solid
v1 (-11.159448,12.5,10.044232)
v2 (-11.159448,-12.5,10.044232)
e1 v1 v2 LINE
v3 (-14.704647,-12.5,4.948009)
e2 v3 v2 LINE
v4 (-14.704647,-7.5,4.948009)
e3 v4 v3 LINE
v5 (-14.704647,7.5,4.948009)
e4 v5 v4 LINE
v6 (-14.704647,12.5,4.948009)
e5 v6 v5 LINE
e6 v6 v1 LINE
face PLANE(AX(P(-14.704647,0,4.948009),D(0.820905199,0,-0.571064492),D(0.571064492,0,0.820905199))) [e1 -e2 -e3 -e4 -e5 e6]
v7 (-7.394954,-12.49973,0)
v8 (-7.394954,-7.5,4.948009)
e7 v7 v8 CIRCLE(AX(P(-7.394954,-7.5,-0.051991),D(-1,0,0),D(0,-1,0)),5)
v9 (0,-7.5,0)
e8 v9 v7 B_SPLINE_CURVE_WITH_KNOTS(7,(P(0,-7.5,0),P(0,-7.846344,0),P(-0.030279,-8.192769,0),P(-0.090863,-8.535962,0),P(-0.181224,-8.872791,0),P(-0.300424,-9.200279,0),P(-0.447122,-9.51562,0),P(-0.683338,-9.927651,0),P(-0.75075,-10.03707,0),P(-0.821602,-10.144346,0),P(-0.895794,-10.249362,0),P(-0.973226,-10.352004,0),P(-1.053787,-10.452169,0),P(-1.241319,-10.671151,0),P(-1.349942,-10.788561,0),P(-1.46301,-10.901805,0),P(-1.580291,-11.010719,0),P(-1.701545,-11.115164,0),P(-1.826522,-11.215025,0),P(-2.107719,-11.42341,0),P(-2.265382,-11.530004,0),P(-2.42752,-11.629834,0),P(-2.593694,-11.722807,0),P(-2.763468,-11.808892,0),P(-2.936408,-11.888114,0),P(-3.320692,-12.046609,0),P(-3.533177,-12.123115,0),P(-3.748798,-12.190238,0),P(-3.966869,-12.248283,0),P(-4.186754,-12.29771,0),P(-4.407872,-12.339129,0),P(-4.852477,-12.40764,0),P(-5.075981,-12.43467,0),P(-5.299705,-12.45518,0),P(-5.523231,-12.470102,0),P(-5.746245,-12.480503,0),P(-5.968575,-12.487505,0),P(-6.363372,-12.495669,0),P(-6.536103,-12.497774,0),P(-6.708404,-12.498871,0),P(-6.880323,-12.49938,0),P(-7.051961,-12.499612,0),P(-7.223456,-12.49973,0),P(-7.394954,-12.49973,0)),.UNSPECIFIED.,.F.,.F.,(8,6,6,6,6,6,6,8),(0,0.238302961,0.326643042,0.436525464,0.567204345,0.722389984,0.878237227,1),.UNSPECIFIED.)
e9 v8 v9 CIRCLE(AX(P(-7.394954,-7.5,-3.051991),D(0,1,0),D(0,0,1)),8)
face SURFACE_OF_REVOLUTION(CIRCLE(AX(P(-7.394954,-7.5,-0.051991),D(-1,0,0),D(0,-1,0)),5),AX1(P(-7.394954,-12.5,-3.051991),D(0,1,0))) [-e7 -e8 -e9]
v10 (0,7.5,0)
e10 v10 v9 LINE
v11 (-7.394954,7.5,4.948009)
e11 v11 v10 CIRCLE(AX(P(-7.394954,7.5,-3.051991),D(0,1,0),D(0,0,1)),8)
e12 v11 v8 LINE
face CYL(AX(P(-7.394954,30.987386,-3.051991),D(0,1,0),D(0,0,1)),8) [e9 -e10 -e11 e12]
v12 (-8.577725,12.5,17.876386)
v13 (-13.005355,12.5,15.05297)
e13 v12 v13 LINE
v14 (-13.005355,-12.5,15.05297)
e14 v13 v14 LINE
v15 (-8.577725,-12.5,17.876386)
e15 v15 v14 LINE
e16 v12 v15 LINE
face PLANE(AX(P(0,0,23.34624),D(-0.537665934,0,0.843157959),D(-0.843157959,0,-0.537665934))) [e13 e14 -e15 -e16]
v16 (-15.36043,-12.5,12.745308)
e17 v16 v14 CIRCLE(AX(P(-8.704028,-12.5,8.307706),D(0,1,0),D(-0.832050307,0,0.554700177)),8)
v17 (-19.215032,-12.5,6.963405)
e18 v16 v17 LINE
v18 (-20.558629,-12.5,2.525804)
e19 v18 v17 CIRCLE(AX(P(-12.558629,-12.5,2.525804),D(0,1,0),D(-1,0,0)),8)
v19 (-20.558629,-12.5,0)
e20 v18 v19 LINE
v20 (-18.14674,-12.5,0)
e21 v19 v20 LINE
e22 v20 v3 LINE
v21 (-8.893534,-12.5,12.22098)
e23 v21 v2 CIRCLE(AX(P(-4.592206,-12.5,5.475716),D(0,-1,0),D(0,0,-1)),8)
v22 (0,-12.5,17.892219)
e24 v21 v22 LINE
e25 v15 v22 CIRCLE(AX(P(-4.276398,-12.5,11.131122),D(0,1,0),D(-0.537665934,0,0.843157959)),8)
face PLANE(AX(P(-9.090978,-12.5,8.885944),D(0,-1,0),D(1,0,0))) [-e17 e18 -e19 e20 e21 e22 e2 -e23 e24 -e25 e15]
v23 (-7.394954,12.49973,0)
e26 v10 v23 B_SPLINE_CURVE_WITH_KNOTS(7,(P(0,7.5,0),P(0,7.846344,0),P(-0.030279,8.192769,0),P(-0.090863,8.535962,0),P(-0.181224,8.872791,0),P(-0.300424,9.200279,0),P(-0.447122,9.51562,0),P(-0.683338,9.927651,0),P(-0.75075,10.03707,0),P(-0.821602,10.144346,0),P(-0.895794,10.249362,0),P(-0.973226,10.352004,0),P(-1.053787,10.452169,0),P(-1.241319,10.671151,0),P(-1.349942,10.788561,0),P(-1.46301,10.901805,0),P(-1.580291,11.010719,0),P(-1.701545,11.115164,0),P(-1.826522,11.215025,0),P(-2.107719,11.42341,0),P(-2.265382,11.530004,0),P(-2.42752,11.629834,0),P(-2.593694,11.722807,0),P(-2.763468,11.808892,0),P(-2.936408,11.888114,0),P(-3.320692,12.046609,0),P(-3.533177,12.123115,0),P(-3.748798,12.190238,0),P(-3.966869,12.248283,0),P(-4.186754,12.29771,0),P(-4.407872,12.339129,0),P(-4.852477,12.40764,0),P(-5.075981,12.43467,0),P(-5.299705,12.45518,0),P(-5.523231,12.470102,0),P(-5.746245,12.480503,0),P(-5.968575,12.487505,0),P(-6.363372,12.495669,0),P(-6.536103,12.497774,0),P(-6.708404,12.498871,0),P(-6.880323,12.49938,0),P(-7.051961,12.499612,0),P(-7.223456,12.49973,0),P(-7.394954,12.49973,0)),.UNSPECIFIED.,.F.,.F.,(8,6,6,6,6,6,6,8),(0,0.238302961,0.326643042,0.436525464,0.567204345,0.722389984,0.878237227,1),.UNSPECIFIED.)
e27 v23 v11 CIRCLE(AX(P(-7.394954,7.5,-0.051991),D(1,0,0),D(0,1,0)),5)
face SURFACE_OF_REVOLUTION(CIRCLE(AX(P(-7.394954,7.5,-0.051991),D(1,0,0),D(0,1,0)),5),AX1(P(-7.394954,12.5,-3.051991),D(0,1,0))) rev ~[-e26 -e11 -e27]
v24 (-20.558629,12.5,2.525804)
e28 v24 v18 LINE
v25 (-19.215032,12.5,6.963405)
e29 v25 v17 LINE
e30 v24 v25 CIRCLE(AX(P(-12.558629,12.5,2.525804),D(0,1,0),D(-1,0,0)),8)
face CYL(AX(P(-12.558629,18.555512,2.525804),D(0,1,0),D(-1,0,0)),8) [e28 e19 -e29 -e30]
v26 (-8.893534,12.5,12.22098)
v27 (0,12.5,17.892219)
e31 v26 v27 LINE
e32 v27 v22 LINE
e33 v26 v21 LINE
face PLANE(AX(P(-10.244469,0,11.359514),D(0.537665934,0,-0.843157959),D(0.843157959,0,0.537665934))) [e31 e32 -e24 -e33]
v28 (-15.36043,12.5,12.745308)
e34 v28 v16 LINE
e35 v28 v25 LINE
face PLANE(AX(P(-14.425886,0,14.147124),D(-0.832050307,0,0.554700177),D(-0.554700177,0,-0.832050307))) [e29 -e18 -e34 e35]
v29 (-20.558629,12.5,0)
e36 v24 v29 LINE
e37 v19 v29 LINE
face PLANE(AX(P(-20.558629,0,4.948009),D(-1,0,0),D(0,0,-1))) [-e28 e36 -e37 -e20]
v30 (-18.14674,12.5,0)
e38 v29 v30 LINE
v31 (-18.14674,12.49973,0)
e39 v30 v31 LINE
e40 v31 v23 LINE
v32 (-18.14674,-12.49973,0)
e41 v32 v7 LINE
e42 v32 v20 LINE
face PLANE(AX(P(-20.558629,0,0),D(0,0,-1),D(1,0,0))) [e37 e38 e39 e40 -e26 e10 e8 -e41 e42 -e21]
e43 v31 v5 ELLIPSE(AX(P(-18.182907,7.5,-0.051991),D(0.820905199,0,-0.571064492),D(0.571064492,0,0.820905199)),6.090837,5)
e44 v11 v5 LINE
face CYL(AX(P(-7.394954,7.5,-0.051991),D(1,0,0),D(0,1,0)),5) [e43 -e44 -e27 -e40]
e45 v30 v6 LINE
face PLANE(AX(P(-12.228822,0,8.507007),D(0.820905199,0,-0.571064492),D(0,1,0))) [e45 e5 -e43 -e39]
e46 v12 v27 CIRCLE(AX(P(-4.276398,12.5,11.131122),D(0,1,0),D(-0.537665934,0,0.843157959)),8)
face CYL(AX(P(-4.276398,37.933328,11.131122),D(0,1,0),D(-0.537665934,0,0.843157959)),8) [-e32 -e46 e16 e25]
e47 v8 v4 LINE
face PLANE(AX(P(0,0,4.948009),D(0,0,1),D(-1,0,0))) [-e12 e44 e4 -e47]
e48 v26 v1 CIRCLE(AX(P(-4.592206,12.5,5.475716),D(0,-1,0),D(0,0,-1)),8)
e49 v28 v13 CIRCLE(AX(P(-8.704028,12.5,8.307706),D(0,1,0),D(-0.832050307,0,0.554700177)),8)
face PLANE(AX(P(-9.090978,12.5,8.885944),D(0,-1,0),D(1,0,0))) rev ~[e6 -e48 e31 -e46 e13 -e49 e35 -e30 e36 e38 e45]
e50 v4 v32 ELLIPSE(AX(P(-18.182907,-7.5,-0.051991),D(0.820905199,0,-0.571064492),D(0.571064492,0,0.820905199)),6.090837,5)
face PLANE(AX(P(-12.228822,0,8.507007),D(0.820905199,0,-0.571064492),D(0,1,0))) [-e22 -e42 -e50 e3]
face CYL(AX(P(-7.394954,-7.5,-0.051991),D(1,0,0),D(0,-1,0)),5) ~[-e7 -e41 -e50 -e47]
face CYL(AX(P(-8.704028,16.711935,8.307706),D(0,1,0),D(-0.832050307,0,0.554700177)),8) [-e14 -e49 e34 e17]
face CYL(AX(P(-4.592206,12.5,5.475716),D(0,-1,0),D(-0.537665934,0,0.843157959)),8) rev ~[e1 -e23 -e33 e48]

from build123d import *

# Parameters (mm, degrees)
F1_DEPTH     = 12.5
F2_T1_DEPTH  = 75.8666564448
F2_T3_DEPTH  = 33.4238697913
F2_T5_DEPTH  = 37.1110249992
F2_T7_DEPTH  = 61.9747717196
F3_T2_ANGLE  = 157.1183672373
F3_T4_ANGLE  = 157.1183672373
F3_T8_DEPTH  = 19.8096921988
F3_T13_DEPTH = 19.8096921988
F4_R         = 8


# Not quite as in the source:
# - a fillet or chamfer that OpenCascade refuses, or shapes differently, is made with other operations: its cross-section is extruded or revolved along the edge and cut away or added


with BuildPart() as f1:
    # F0 (on Front) → F1 (new body, symmetric)
    with BuildSketch(Plane.XZ):
        Polygon((-20.558629185, 0), (0, 0), (0, 4.9480088055), (-14.7046465427, 4.9480088055), (-10.2444691584, 11.3595137373), (0, 17.8922185832), (0, 23.3462397009), (-14.4258858636, 14.1471242532), (-20.558629185, 4.9480088055), align=None)
    extrude(amount=F1_DEPTH, both=True)

    # F2: fillet of radius 8 on 4 edges, made by hand

    # F2_s2 → F2_t1 (cut)
    with BuildSketch(Plane.XZ.offset(-37.9333282224)):
        with BuildLine():
            ThreePointArc((-8.5777252412, 17.8763860282), (-4.2911639454, 19.1311087323), (0, 17.8922185832))
            Line((0, 17.8922185832), (0, 23.3462397009))
            Line((0, 23.3462397009), (-8.5777252412, 17.8763860282))
        make_face()
    extrude(amount=F2_T1_DEPTH, mode=Mode.SUBTRACT)

    # F2_s4 → F2_t3 (cut)
    with BuildSketch(Plane.XZ.offset(-16.7119348957)):
        with BuildLine():
            ThreePointArc((-15.3604302761, 12.7453075635), (-14.3030712709, 14.0217863385), (-13.0053552923, 15.0529698176))
            Line((-13.0053552923, 15.0529698176), (-14.4258858636, 14.1471242532))
            Line((-14.4258858636, 14.1471242532), (-15.3604302761, 12.7453075635))
        make_face()
    extrude(amount=F2_T3_DEPTH, mode=Mode.SUBTRACT)

    # F2_s6 → F2_t5 (cut)
    with BuildSketch(Plane.XZ.offset(-18.5555124996)):
        with BuildLine():
            ThreePointArc((-20.558629185, 2.5258038057), (-20.215365424, 4.8440769057), (-19.2150316433, 6.96340522))
            Line((-19.2150316433, 6.96340522), (-20.558629185, 4.9480088055))
            Line((-20.558629185, 4.9480088055), (-20.558629185, 2.5258038057))
        make_face()
    extrude(amount=F2_T5_DEPTH, mode=Mode.SUBTRACT)

    # F2_s8 → F2_t7 (cut)
    with BuildSketch(Plane.XZ.offset(-30.9873858598)):
        with BuildLine():
            ThreePointArc((-7.3949543439, 4.9480088055), (-2.9461303171, 3.5969158419), (0, 0))
            Line((0, 0), (0, 4.9480088055))
            Line((0, 4.9480088055), (-7.3949543439, 4.9480088055))
        make_face()
    extrude(amount=F2_T7_DEPTH, mode=Mode.SUBTRACT)

    # F3: fillet of radius 5 on 4 edges, made by hand

    # F3_s1 → F3_t2 (revolve, cut)
    with BuildSketch(Plane.YZ.offset(-7.3949543439)):
        with BuildLine():
            ThreePointArc((12.5, -0.0519911945), (11.0355339059, 3.4835427114), (7.5, 4.9480088055))
            Line((7.5, 4.9480088055), (12.5, 4.9480088055))
            Line((12.5, 4.9480088055), (12.5, -0.0519911945))
        make_face()
    revolve(axis=Axis((-7.3949543439, 12.5, -3.0519911944), (0, 1, 0)), revolution_arc=F3_T2_ANGLE, mode=Mode.SUBTRACT)

    # F3_s3 → F3_t4 (revolve, cut)
    with BuildSketch(Plane.YZ.offset(-7.3949543439)):
        with BuildLine():
            ThreePointArc((-12.5, -0.0519911945), (-11.0355339059, 3.4835427114), (-7.5, 4.9480088055))
            Line((-7.5, 4.9480088055), (-12.5, 4.9480088055))
            Line((-12.5, 4.9480088055), (-12.5, -0.0519911945))
        make_face()
    revolve(axis=Axis((-7.3949543439, -12.5, -3.0519911944), (0, 1, 0)), revolution_arc=F3_T4_ANGLE, mode=Mode.SUBTRACT)


with BuildPart() as f3_tool6:
    # F3_s7 → F3_t8 (new body)
    with BuildSketch(Plane.YZ.offset(-7.3949543439)):
        with BuildLine():
            ThreePointArc((-12.5, -0.0519911945), (-11.0355339059, 3.4835427114), (-7.5, 4.9480088055))
            Line((-7.5, 4.9480088055), (-12.5, 4.9480088055))
            Line((-12.5, 4.9480088055), (-12.5, -0.0519911945))
        make_face()
    extrude(amount=-F3_T8_DEPTH)

    split(bisect_by=Plane(origin=(-12.2288219378, 0, 8.5070066427), x_dir=(0, 1, 0), z_dir=(0.8209051994, 0, -0.5710644917)), keep=Keep.TOP)


with BuildPart() as f1_1:
    add(f1.part)

    # F3_t5: cut F3_tool6
    add(f3_tool6.part, mode=Mode.SUBTRACT)


with BuildPart() as f3_tool11:
    # F3_s12 → F3_t13 (new body)
    with BuildSketch(Plane.YZ.offset(-7.3949543439)):
        with BuildLine():
            ThreePointArc((12.5, -0.0519911945), (11.0355339059, 3.4835427114), (7.5, 4.9480088055))
            Line((7.5, 4.9480088055), (12.5, 4.9480088055))
            Line((12.5, 4.9480088055), (12.5, -0.0519911945))
        make_face()
    extrude(amount=-F3_T13_DEPTH)

    split(bisect_by=Plane(origin=(-12.2288219378, 0, 8.5070066427), x_dir=(0, 1, 0), z_dir=(0.8209051994, 0, -0.5710644917)), keep=Keep.TOP)


with BuildPart() as f1_2:
    add(f1_1.part)

    # F3_t10: cut F3_tool11
    add(f3_tool11.part, mode=Mode.SUBTRACT)

    # F4
    f4_edges = [f1_2.edges().sort_by_distance(p)[0] for p in [
        (-10.244469, 0, 11.359514),
    ]]
    fillet(f4_edges, radius=F4_R)


solid = f1_2.part
